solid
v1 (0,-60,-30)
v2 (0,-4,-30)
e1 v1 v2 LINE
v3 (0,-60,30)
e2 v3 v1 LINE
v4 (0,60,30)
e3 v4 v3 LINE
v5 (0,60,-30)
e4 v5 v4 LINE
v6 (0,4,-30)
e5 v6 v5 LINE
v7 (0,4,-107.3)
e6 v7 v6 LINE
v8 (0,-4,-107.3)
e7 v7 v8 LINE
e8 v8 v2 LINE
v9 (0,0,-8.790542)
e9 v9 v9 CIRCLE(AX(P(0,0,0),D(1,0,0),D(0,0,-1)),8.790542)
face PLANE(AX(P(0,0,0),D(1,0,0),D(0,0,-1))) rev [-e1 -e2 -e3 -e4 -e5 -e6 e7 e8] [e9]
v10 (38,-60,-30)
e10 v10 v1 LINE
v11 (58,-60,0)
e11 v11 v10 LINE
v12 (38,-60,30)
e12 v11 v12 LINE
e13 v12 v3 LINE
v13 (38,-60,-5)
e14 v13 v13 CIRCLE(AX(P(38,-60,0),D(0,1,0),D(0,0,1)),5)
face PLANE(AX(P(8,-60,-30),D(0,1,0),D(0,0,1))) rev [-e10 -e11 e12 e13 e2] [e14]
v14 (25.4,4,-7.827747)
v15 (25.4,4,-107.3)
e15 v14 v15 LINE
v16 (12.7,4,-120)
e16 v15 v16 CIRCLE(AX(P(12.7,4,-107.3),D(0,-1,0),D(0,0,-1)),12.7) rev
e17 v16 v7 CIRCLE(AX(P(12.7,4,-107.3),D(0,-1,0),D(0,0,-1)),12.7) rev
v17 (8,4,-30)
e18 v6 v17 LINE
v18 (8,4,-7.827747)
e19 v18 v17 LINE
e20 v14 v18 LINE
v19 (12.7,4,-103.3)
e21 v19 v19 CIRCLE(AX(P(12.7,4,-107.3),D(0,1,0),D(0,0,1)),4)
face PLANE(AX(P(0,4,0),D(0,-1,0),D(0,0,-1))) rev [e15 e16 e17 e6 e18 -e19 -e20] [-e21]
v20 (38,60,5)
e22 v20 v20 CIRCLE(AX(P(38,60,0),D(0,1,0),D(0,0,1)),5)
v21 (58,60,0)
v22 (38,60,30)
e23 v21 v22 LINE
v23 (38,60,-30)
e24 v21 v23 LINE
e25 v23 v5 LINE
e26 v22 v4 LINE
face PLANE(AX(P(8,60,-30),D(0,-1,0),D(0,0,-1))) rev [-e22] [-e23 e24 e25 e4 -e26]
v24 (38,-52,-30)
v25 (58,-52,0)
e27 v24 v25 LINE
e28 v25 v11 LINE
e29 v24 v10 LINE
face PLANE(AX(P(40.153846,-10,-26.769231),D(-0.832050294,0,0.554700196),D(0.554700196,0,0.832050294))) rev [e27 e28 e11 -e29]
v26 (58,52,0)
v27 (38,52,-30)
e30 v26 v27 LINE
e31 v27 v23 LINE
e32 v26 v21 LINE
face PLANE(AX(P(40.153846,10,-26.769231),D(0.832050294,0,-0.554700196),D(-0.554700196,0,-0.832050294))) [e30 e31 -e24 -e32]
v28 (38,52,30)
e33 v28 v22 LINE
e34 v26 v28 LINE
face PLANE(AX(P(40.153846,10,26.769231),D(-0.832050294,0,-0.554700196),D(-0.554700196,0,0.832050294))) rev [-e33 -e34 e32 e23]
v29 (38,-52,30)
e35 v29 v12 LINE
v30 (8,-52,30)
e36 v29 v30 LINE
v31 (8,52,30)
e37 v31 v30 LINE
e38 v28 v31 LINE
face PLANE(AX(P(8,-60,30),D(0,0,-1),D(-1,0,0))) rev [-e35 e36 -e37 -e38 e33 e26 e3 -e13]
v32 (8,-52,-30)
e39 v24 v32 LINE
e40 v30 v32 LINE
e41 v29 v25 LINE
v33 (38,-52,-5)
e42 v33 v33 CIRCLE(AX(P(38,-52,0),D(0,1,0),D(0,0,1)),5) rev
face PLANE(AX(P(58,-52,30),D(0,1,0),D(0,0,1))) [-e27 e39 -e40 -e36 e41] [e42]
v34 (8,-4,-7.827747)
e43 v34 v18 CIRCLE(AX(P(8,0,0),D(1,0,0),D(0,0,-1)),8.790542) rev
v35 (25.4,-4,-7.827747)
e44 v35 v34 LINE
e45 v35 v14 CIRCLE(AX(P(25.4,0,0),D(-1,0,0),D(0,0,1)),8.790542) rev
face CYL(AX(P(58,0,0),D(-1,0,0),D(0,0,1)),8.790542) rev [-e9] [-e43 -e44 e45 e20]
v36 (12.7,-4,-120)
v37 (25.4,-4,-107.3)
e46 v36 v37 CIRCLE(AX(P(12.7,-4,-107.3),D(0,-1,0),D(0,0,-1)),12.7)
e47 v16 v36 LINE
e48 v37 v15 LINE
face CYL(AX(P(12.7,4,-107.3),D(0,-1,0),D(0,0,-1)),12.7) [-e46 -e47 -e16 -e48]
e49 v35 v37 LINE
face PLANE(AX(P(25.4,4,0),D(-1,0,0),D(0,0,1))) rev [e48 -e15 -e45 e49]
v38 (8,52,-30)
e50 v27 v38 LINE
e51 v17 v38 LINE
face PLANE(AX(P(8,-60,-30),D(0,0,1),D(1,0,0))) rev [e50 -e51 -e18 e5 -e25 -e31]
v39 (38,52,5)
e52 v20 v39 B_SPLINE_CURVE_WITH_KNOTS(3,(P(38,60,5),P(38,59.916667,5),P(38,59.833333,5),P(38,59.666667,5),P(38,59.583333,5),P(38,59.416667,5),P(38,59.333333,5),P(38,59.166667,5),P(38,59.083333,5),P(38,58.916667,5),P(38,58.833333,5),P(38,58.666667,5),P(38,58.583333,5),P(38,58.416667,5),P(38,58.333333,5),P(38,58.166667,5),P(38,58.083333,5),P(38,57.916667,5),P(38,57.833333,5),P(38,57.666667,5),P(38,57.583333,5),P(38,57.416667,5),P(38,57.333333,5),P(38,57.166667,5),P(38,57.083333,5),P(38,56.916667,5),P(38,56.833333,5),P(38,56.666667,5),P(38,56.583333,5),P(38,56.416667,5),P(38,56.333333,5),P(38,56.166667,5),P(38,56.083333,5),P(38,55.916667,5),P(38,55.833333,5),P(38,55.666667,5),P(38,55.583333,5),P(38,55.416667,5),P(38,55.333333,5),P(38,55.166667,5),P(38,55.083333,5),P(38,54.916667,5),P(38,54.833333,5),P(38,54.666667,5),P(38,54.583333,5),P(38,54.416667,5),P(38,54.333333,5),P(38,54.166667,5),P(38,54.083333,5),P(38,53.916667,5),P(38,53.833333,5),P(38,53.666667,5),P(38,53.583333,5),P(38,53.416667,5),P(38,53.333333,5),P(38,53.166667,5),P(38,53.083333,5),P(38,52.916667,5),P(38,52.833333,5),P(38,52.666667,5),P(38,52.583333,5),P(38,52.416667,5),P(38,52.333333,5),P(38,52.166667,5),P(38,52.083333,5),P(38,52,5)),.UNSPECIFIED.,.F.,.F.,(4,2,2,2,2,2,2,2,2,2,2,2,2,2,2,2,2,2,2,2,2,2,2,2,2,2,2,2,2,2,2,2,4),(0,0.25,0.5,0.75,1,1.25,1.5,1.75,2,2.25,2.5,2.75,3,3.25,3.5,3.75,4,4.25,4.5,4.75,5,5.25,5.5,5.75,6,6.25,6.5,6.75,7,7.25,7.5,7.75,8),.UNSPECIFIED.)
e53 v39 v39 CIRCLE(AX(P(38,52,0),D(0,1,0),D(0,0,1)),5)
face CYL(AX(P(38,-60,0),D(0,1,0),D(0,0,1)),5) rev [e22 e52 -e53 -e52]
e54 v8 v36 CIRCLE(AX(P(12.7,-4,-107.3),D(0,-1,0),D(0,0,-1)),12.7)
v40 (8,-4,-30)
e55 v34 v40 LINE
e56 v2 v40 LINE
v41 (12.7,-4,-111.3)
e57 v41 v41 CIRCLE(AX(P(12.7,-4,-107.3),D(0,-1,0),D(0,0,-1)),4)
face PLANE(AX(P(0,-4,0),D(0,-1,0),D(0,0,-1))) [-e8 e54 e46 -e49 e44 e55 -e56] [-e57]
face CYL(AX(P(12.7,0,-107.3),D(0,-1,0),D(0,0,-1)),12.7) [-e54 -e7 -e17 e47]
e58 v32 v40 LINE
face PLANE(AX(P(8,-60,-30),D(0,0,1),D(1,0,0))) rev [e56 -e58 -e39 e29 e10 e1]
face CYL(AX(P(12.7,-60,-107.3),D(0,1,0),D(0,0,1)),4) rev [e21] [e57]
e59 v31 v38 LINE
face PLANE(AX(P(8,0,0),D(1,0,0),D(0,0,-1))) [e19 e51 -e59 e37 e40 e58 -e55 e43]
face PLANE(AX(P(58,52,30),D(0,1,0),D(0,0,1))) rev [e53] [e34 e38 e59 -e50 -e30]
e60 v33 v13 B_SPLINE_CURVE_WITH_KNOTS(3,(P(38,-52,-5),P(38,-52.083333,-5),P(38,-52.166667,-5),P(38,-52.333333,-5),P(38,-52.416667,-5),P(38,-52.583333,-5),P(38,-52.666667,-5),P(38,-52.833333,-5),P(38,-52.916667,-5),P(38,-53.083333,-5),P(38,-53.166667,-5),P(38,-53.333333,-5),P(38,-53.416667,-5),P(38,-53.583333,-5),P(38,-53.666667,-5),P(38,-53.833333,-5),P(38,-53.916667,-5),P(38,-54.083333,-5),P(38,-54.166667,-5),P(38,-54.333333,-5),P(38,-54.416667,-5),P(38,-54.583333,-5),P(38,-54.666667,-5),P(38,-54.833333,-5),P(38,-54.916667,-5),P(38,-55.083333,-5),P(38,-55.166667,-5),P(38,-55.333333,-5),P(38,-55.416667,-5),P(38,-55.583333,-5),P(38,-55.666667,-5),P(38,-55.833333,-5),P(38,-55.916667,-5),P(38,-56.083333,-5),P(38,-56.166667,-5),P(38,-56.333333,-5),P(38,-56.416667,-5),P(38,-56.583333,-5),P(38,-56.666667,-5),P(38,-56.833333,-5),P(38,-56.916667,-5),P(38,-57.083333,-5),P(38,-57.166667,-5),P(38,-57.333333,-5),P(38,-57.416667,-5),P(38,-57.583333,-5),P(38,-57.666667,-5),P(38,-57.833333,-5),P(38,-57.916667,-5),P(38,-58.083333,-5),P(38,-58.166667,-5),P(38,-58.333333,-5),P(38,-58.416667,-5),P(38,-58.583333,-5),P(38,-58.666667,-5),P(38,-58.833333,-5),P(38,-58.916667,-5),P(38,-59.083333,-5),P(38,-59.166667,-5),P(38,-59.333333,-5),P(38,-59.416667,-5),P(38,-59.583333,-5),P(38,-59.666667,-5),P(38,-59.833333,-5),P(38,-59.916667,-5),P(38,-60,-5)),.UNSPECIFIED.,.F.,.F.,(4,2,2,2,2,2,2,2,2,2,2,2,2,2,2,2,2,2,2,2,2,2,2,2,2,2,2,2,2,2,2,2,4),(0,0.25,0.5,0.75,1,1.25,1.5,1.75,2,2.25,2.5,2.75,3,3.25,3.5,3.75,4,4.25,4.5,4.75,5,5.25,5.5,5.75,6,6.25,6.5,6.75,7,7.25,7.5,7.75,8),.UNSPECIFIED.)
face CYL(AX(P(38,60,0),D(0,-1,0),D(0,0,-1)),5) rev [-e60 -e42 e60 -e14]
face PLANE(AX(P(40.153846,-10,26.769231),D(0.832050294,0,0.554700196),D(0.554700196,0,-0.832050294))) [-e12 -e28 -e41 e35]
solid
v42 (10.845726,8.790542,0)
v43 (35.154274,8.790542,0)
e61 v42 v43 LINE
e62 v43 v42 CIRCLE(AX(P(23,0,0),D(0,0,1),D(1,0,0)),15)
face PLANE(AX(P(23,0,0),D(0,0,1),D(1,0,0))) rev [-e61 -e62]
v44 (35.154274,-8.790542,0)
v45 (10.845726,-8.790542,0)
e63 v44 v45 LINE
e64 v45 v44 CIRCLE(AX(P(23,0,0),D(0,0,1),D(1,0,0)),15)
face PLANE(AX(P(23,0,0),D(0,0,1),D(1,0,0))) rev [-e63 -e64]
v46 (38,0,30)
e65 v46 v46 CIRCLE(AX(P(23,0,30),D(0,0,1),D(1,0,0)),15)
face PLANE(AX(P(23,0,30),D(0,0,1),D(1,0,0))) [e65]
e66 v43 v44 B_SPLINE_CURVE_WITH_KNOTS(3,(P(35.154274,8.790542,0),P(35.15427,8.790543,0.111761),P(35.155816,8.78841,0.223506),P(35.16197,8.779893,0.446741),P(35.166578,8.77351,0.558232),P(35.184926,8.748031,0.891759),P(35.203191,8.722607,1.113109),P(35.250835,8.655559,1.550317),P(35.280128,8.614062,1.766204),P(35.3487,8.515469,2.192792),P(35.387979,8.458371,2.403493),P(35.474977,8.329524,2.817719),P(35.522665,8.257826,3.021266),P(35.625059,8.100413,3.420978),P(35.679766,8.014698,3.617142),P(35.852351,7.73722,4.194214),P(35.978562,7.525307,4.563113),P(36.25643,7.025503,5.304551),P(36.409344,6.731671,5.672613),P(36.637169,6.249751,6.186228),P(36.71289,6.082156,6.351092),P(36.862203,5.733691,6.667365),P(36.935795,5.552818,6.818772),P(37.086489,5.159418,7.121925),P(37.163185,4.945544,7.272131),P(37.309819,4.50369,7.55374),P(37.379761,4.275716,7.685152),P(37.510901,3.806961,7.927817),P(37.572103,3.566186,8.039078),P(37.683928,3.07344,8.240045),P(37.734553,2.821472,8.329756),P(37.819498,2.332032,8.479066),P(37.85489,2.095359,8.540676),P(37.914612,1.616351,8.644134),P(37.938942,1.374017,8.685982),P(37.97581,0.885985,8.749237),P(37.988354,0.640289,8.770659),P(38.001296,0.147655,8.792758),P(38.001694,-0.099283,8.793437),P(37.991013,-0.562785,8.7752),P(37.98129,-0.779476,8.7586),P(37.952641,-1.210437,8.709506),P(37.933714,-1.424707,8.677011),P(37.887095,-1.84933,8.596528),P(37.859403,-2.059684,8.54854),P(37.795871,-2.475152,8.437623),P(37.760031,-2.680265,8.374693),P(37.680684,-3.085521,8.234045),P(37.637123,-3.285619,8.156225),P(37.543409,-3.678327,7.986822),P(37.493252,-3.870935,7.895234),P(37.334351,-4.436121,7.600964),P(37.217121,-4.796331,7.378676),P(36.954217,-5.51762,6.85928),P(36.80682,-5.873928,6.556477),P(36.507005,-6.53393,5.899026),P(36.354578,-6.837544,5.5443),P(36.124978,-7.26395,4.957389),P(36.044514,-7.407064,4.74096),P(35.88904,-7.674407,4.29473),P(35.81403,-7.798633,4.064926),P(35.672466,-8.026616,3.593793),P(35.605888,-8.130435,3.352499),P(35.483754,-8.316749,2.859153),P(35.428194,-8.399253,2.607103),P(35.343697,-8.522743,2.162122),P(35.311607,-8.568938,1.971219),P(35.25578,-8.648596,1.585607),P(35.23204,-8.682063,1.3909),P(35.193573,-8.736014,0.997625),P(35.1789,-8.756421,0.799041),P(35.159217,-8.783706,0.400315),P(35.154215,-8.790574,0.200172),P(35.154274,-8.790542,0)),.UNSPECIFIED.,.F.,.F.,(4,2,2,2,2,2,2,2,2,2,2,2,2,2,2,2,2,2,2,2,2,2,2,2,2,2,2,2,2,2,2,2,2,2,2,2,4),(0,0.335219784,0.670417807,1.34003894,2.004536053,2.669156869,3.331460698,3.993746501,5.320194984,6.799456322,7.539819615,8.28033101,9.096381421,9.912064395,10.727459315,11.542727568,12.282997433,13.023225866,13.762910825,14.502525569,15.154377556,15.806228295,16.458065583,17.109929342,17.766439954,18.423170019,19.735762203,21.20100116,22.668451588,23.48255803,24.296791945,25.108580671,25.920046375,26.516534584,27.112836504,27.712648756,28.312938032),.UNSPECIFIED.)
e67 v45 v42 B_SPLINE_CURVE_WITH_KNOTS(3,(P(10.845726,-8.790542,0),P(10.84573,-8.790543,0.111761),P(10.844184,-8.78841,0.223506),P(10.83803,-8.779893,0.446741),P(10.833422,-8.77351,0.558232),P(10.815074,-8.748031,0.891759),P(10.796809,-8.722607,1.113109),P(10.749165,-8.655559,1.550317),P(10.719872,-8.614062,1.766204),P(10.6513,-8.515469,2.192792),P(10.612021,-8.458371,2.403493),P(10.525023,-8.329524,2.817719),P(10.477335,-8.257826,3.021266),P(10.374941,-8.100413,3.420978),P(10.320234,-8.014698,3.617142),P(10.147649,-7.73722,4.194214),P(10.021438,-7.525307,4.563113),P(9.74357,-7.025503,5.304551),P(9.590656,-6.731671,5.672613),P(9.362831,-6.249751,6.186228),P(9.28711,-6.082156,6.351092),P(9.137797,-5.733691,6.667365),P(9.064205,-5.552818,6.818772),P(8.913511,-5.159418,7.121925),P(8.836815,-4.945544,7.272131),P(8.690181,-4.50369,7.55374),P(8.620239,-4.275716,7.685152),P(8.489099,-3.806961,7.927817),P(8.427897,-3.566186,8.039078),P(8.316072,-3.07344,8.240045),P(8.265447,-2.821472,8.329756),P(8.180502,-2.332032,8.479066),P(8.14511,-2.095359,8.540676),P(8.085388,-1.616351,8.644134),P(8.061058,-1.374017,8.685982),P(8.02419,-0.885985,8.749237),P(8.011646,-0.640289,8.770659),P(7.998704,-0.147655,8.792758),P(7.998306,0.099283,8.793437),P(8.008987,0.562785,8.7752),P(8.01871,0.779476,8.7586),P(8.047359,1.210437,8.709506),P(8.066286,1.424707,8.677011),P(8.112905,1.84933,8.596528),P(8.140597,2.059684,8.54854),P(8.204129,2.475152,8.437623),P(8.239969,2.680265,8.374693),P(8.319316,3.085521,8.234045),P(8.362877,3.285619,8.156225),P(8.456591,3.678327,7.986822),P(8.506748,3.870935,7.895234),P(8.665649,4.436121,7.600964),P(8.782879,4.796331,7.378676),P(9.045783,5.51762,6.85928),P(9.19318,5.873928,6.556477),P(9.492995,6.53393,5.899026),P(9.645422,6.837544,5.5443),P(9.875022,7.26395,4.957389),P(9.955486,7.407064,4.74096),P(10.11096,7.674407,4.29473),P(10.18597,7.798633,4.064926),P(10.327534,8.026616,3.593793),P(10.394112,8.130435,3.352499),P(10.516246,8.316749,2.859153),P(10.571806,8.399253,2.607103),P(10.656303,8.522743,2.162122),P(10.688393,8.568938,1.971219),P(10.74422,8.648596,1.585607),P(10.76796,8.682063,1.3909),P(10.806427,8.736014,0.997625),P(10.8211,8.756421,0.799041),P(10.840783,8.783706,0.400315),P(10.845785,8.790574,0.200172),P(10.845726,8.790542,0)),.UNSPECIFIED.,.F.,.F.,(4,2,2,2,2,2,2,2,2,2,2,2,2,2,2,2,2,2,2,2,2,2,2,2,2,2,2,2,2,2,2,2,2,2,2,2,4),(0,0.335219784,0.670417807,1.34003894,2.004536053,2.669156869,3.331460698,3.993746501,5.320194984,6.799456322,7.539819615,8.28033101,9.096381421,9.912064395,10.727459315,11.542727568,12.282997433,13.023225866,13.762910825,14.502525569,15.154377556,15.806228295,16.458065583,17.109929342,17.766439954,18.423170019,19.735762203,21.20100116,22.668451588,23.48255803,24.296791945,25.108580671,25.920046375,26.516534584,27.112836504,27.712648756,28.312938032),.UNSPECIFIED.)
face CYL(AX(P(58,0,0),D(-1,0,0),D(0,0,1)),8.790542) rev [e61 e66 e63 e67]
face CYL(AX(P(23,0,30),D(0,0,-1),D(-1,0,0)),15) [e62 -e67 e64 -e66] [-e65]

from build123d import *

# Parameters (mm, degrees)
SKETCH2_W               = 60
SKETCH2_H               = 120
BOSS_EXTRUDE1_DEPTH     = 8
SKETCH3_W               = 60
SKETCH3_H               = 8
BOSS_EXTRUDE2_DEPTH     = 50
CUT_EXTRUDE1_DEPTH      = 50
SKETCH5_R               = 5
CUT_EXTRUDE2_DEPTH      = 137.616250864
SKETCH7_W               = 25.4
SKETCH7_H               = 120
BOSS_EXTRUDE3_DEPTH     = 4
FILLET1_R               = 12.7
SKETCH9_R               = 4
CUT_EXTRUDE4_DEPTH      = 148.851276626
SKETCH11_R              = 15
BOSS_EXTRUDE4_DEPTH     = 30
CUT_EXTRUDE3_DEPTH      = 144.178210633
CUT_EXTRUDE3_DEPTH_BACK = 144.178210633
SKETCH6_R               = 8.790541624


with BuildPart() as part:
    # Sketch2 → Boss-Extrude1 (new body)
    with BuildSketch(Plane(origin=(0, 0, 0), x_dir=(0, 0, -1), z_dir=(1, 0, 0))):
        Rectangle(SKETCH2_W, SKETCH2_H)
    extrude(amount=BOSS_EXTRUDE1_DEPTH)

    # Sketch3 → Boss-Extrude2 (add)
    with BuildSketch(Plane(origin=(8, 0, 0), x_dir=(0, 0, -1), z_dir=(1, 0, 0))):
        with Locations((0, 56)):
            Rectangle(SKETCH3_W, SKETCH3_H)
    boss_extrude2 = extrude(amount=BOSS_EXTRUDE2_DEPTH)

    # Sketch4 → Cut-Extrude1 (cut)
    with BuildSketch(Plane(origin=(0, 60, 0), x_dir=(1, 0, 0), z_dir=(0, 1, 0))):
        Polygon((38, 30), (58, 0), (58, 30), align=None)
        Polygon((58, -30), (58, 0), (38, -30), align=None)
    cut_extrude1 = extrude(amount=-CUT_EXTRUDE1_DEPTH, mode=Mode.SUBTRACT)

    # Sketch5 → Cut-Extrude2 (cut, through all)
    with BuildSketch(Plane(origin=(0, 60, 0), x_dir=(1, 0, 0), z_dir=(0, 1, 0))):
        with Locations(Location((38, 0, 0), (0, 0, 270))):
            Circle(SKETCH5_R)
    cut_extrude2 = extrude(amount=-CUT_EXTRUDE2_DEPTH, mode=Mode.SUBTRACT)

    # Mirror1: Boss-Extrude2, Cut-Extrude1, Cut-Extrude2 across plane
    add(boss_extrude2.mirror(Plane.ZX))
    add(cut_extrude1.mirror(Plane.ZX), mode=Mode.SUBTRACT)
    add(cut_extrude2.mirror(Plane.ZX), mode=Mode.SUBTRACT)

    # Sketch7 → Boss-Extrude3 (add, symmetric)
    with BuildSketch(Plane(origin=(0, 0, 0), x_dir=(1, 0, 0), z_dir=(0, 1, 0))):
        with Locations((12.7, 60)):
            Rectangle(SKETCH7_W, SKETCH7_H)
    extrude(amount=BOSS_EXTRUDE3_DEPTH, both=True)

    # Fillet1
    fillet1_edges = [part.edges().sort_by_distance(p)[0] for p in [
        (0, 0, -120),
        (25.4, 0, -120),
    ]]
    fillet(fillet1_edges, radius=FILLET1_R - 0.0001)  # a hair under: the kernel refuses the full size

    # Sketch9 → Cut-Extrude4 (cut, through all)
    with BuildSketch(Plane(origin=(0, 4, 0), x_dir=(1, 0, 0), z_dir=(0, 1, 0))):
        with Locations(Location((12.7, 107.3, 0), (0, 0, 270))):
            Circle(SKETCH9_R)
    extrude(amount=-CUT_EXTRUDE4_DEPTH, mode=Mode.SUBTRACT)


with BuildPart() as body_2:
    # Sketch11 → Boss-Extrude4 (new body)
    with BuildSketch(Plane.XY):
        with Locations((23, 0)):
            Circle(SKETCH11_R)
    extrude(amount=BOSS_EXTRUDE4_DEPTH)


with BuildPart() as cut_extrude3_tool:
    # Sketch6 → Cut-Extrude3 (new, two sides: drawn at the far end of the back side and taken through both)
    with BuildSketch(Plane(origin=(8, 0, 0), x_dir=(0, 0, -1), z_dir=(1, 0, 0)).offset(-CUT_EXTRUDE3_DEPTH_BACK)):
        with Locations(Location((0, 0, 0), (0, 0, 27.067156143))):
            Circle(SKETCH6_R)
    extrude(amount=CUT_EXTRUDE3_DEPTH + CUT_EXTRUDE3_DEPTH_BACK)


with BuildPart() as part_1:
    add(part.part)

    # Cut-Extrude3: cut by cut_extrude3_tool
    add(cut_extrude3_tool.part, mode=Mode.SUBTRACT)


with BuildPart() as body_2_1:
    add(body_2.part)

    # Cut-Extrude3: cut by cut_extrude3_tool
    add(cut_extrude3_tool.part, mode=Mode.SUBTRACT)


solid = Compound([part_1.part, body_2_1.part])
